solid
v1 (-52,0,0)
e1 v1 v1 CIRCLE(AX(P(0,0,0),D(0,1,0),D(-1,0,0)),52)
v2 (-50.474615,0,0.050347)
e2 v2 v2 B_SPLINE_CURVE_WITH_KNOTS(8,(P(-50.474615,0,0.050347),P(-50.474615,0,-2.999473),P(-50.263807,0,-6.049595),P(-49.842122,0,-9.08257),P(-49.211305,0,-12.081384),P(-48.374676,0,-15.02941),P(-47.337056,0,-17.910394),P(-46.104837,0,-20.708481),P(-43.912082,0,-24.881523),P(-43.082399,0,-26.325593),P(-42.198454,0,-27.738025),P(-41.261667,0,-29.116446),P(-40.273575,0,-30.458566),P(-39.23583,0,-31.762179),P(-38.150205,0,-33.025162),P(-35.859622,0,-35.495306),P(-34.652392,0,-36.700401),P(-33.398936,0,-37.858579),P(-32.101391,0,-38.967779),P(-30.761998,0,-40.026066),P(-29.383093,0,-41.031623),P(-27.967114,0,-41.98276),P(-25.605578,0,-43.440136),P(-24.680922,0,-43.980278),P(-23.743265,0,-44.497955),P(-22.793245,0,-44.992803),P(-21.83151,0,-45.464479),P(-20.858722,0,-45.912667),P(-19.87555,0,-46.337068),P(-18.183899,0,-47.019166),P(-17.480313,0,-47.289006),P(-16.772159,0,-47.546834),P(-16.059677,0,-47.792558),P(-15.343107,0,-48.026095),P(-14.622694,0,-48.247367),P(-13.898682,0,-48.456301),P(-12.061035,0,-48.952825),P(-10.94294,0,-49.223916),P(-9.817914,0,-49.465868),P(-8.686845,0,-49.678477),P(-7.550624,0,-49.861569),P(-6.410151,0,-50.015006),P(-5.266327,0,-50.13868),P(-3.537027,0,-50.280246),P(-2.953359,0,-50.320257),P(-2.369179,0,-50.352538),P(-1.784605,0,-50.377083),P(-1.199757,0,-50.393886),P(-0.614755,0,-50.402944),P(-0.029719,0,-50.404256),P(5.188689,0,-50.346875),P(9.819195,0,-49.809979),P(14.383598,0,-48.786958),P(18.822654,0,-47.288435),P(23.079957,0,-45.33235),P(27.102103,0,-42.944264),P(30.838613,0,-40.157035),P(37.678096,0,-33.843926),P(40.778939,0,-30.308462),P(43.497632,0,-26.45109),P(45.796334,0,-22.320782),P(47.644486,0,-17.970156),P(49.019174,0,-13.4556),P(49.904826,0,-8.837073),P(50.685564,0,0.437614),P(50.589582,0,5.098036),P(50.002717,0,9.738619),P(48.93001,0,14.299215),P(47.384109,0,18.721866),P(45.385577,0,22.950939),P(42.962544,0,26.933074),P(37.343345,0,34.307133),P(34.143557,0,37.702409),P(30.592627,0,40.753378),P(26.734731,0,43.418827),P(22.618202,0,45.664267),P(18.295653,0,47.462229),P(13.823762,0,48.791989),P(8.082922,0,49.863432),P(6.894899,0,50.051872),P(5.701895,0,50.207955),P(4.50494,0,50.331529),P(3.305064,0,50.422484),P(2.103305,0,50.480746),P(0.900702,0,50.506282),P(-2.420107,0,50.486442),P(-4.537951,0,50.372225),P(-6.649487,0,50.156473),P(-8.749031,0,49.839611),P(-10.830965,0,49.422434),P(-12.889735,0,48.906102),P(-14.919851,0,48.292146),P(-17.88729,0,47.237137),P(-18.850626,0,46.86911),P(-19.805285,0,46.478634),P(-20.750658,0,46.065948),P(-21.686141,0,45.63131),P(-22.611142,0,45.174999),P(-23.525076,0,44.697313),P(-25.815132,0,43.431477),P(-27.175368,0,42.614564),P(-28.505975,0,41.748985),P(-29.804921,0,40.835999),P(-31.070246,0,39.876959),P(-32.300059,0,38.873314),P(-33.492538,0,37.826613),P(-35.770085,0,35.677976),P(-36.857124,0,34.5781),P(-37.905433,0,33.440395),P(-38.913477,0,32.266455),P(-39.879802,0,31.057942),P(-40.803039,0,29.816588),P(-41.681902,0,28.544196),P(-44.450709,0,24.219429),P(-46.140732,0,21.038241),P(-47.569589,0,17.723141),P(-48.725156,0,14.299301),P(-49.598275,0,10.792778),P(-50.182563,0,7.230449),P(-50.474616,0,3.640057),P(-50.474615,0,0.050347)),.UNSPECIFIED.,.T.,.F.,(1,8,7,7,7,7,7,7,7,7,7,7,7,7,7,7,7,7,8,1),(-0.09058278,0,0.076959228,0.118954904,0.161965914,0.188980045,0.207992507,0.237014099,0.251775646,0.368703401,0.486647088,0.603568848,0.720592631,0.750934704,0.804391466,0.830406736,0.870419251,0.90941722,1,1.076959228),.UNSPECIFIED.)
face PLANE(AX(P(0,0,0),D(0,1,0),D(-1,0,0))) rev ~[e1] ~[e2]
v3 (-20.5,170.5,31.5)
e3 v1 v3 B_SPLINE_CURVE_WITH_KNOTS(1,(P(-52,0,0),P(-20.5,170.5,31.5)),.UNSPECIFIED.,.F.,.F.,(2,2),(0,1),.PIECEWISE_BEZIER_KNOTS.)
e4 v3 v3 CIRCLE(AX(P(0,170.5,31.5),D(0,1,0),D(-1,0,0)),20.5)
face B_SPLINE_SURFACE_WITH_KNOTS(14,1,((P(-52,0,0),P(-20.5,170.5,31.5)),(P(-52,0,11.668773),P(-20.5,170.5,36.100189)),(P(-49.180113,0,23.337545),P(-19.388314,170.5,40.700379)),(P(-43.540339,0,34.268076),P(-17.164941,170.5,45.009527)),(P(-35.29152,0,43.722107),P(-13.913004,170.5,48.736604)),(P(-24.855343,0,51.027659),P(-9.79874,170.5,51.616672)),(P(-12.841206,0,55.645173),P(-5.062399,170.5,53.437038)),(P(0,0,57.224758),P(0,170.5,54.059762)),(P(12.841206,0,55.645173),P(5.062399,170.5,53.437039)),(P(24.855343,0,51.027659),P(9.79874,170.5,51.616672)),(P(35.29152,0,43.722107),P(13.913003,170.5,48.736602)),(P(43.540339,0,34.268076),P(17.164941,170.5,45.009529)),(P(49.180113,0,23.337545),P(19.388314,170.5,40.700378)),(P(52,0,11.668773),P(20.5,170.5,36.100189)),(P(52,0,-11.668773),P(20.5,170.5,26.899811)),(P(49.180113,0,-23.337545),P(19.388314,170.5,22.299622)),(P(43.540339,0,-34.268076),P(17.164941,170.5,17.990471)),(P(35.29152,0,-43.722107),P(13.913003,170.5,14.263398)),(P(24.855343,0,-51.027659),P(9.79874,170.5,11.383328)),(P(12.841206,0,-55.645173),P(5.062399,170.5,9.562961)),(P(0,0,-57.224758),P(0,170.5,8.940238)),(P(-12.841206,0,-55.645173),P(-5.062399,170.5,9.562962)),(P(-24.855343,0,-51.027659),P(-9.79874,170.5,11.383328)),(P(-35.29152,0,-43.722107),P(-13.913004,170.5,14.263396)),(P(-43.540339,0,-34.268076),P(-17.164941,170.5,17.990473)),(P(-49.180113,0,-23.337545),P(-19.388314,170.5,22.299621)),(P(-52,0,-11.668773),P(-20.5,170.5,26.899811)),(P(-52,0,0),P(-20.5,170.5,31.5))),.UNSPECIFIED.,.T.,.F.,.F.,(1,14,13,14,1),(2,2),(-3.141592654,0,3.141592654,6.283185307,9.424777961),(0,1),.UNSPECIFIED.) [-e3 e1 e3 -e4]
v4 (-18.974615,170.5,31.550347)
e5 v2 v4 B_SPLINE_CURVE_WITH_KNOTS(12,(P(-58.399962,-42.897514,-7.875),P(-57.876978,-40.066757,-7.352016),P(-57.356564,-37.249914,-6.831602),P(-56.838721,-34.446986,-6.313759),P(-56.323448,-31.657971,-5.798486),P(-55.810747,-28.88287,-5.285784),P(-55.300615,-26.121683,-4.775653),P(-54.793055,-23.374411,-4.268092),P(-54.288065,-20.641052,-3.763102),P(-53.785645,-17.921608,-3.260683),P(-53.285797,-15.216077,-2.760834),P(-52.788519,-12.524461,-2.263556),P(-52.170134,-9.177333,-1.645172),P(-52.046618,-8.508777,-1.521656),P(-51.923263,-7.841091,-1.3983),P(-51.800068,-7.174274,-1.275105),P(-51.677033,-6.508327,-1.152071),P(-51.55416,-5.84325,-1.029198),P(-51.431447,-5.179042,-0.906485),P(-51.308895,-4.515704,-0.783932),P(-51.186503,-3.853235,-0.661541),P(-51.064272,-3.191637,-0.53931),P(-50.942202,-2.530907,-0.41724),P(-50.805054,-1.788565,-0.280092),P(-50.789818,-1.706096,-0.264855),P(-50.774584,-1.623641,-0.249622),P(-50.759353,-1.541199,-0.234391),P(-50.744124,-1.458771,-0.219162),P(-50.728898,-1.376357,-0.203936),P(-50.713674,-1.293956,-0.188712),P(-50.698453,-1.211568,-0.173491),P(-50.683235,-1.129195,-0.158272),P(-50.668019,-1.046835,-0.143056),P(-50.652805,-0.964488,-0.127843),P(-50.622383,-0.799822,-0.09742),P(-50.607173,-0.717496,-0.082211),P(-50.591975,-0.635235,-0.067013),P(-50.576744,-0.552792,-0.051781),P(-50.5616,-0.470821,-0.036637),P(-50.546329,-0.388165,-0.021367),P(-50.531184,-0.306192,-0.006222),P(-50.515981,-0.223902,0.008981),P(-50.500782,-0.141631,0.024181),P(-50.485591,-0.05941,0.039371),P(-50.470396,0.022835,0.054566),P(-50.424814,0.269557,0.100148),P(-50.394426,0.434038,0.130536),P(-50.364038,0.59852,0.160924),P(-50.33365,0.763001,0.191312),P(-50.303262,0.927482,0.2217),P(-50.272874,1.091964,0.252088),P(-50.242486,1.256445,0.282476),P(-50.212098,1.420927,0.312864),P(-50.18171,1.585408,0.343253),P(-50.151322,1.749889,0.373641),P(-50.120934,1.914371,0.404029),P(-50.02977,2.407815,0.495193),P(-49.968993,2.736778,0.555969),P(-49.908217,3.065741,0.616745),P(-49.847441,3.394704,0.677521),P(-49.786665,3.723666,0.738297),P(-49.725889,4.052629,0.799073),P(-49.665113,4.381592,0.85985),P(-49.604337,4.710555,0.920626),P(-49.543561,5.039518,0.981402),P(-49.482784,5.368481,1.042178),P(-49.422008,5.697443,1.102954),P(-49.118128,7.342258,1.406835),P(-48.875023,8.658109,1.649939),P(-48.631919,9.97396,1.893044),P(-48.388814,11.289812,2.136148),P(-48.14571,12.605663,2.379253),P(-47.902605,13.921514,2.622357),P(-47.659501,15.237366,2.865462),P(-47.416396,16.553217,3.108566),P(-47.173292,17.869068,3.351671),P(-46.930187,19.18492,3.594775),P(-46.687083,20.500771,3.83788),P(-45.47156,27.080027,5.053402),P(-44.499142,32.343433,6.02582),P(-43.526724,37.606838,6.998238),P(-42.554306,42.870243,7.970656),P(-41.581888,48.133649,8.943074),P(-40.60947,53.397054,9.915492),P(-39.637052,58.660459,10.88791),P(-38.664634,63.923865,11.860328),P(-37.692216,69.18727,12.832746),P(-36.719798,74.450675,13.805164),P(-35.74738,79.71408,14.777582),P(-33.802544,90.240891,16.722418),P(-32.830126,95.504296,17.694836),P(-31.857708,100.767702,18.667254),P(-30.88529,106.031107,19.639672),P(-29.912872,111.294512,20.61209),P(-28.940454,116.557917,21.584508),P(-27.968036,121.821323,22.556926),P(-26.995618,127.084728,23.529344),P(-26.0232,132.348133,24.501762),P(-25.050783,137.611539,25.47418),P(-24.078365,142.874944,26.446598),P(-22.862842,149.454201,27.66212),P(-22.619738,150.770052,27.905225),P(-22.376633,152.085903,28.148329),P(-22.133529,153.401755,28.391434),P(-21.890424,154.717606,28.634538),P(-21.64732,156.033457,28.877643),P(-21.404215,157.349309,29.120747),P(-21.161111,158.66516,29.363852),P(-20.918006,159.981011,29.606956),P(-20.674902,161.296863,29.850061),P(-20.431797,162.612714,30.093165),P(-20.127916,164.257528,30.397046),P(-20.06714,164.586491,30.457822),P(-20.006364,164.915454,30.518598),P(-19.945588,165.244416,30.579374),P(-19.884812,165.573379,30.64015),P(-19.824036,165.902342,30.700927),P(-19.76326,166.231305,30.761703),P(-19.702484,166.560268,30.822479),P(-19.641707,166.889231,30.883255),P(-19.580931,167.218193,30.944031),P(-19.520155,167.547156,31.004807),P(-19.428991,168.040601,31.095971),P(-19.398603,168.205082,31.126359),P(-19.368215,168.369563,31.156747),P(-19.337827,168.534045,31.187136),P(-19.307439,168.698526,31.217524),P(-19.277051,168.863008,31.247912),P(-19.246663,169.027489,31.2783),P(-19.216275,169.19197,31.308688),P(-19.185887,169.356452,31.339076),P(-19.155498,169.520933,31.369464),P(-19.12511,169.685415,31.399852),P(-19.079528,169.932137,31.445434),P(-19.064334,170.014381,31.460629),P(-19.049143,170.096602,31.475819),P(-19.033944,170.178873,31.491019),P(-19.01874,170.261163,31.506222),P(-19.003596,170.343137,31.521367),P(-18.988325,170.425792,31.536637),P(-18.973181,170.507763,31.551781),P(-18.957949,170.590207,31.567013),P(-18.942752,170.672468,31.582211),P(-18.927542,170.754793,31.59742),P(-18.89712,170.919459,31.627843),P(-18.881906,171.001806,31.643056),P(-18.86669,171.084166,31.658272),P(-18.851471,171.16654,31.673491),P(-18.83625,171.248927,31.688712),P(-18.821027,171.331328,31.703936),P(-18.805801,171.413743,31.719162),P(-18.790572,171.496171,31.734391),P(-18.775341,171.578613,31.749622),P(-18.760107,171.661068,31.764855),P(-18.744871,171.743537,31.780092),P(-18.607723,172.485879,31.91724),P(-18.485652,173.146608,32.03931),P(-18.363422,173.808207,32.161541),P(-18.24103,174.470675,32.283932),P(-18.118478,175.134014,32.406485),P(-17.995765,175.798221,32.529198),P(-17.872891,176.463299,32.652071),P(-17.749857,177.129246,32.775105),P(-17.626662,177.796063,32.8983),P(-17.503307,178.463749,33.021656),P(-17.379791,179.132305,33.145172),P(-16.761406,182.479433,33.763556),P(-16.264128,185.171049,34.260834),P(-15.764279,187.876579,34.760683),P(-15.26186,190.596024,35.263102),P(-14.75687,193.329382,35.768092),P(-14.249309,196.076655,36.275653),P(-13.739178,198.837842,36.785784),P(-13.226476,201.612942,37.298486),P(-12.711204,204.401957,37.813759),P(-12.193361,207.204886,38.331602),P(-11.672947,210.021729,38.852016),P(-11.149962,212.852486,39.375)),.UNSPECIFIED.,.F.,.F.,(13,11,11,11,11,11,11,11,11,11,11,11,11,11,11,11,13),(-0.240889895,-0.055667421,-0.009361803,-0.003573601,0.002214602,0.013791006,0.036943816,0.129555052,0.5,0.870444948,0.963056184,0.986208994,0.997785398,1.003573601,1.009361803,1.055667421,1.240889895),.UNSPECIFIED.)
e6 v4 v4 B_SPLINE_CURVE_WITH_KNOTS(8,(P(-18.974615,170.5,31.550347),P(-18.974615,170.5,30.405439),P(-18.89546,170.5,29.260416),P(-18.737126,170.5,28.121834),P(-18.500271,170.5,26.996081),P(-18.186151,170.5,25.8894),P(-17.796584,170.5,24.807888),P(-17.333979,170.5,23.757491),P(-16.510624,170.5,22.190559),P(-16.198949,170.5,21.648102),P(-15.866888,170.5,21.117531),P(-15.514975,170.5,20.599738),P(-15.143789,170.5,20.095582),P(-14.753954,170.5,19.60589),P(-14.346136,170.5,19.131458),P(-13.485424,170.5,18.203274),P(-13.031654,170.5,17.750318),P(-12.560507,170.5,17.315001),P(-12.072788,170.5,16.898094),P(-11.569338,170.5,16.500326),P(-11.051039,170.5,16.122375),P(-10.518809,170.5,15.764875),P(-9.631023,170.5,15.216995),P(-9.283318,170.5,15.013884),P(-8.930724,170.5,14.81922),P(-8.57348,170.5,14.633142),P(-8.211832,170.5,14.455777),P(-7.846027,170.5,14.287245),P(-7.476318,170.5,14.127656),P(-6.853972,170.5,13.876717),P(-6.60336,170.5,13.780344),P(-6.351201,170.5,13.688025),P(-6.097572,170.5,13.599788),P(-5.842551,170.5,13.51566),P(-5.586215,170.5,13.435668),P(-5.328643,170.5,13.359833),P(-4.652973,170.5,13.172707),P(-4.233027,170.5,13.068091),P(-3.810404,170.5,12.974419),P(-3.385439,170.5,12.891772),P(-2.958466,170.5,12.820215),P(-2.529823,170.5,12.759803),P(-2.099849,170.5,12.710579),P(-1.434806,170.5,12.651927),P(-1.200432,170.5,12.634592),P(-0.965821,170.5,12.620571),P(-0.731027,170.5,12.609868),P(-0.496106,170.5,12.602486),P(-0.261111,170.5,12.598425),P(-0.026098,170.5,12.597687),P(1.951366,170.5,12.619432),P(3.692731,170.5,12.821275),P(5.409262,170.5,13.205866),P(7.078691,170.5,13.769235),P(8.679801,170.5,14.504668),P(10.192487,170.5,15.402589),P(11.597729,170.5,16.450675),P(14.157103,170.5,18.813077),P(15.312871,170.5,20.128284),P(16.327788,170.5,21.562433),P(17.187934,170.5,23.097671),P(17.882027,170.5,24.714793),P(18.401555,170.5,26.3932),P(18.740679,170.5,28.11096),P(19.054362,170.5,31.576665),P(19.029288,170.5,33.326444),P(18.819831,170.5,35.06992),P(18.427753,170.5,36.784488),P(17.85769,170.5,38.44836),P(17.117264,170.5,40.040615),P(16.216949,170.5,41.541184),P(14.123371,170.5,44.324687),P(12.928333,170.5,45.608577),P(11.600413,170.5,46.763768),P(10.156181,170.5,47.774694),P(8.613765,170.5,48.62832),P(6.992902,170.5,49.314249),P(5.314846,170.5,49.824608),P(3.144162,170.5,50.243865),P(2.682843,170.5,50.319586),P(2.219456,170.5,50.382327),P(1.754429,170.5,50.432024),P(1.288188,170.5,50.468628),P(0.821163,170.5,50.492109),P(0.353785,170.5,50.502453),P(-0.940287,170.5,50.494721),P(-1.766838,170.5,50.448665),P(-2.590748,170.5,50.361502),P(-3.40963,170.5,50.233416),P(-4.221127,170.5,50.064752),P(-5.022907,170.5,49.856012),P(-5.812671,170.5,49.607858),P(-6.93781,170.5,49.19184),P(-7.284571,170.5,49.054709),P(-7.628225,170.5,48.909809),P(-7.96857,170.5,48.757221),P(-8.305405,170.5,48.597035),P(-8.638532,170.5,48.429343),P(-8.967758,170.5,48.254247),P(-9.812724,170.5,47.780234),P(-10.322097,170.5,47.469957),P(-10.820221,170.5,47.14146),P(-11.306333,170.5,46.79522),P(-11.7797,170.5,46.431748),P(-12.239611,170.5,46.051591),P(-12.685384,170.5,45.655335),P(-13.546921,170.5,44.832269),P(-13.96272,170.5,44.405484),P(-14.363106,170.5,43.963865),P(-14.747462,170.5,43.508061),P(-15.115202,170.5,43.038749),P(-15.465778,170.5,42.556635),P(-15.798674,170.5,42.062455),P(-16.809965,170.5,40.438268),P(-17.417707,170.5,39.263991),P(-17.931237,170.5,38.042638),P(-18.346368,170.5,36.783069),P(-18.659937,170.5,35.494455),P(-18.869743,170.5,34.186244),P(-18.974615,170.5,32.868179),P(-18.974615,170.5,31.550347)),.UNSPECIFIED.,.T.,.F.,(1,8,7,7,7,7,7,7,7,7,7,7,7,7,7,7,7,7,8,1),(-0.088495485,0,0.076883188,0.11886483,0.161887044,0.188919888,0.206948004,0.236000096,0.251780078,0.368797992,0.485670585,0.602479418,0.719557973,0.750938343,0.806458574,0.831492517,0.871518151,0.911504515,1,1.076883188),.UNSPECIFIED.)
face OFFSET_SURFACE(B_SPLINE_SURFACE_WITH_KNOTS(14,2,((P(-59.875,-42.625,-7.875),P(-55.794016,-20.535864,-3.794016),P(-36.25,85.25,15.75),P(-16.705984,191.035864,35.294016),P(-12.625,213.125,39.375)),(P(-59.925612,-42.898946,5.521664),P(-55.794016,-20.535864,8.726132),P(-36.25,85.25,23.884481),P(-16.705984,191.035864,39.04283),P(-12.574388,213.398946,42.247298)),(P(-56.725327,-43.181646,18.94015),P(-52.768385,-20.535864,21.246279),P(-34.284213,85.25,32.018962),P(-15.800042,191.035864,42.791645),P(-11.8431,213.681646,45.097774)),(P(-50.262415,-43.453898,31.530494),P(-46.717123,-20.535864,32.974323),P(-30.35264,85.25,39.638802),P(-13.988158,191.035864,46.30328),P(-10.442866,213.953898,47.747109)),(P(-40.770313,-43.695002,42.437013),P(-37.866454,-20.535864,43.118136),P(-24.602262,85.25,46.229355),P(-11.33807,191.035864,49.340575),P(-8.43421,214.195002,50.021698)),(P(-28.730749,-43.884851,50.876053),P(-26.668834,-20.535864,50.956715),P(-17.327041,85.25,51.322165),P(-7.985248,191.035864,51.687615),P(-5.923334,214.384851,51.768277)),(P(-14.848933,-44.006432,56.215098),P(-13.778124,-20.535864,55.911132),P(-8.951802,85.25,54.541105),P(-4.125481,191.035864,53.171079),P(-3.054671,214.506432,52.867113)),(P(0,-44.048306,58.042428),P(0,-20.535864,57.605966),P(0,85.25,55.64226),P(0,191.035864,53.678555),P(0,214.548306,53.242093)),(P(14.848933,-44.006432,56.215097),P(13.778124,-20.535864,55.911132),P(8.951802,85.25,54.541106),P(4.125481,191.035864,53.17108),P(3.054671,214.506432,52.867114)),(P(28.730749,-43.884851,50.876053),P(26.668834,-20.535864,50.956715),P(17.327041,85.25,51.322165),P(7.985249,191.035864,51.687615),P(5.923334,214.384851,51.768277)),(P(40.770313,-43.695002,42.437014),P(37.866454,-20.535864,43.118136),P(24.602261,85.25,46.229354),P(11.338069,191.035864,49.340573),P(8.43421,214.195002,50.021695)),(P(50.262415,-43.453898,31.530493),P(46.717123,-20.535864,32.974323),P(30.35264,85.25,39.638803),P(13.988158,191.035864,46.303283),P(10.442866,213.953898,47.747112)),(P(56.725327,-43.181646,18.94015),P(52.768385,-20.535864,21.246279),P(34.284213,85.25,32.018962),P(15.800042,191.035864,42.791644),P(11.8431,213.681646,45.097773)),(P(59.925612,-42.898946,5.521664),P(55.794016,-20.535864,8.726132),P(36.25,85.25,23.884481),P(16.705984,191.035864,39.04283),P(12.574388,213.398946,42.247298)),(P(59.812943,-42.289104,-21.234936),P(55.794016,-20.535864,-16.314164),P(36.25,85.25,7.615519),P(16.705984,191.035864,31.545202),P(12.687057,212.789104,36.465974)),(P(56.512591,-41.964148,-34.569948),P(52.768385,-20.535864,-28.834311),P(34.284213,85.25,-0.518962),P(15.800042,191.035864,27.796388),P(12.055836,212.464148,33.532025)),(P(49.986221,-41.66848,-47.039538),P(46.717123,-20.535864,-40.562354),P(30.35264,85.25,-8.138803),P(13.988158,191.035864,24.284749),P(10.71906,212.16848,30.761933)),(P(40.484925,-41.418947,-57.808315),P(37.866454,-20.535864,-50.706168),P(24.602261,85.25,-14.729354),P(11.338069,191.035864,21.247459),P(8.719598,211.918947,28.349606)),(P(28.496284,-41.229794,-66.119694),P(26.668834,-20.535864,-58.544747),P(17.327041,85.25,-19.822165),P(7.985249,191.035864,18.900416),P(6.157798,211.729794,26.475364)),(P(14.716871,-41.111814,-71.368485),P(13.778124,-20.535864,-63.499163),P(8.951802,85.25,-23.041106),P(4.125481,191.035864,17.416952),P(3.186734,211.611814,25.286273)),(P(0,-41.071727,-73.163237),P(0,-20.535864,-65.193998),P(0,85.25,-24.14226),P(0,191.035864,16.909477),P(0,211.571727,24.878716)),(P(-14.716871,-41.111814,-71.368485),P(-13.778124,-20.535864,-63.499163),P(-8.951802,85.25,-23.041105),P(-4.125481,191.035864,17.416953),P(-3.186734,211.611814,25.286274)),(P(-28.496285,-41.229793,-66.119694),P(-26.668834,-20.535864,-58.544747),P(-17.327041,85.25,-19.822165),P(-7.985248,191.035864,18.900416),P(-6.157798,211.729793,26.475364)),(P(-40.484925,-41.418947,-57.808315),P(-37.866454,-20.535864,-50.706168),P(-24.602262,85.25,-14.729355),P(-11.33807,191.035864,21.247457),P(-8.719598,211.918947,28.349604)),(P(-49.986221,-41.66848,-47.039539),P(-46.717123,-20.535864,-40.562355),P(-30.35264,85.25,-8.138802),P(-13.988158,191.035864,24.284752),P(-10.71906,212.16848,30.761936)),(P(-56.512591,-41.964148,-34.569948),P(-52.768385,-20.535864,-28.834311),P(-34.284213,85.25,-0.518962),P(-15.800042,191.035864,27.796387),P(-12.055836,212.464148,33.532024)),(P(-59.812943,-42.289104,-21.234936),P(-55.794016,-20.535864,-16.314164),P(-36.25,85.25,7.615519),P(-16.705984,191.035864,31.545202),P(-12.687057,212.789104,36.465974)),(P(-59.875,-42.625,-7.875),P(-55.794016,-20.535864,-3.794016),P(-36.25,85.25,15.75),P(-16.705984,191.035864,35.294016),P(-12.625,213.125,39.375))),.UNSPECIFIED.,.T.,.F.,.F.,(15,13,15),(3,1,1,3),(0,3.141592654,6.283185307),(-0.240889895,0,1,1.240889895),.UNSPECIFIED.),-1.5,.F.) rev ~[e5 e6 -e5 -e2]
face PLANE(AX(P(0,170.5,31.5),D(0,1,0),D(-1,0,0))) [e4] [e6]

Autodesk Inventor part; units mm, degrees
ref_plane "YZ Plane" through (0, 0, 0) normal (1, 0, 0) x (0, 1, 0)
ref_plane "XY Plane" through (0, 0, 0) normal (0, 0, 1) x (1, 0, 0)
sketch "Szkic6" plane through (0, 0, 0) normal (0, 1, 0) x (-1, 0, 0)
  circle A0 centre (0, 0) radius 52
  dimension "d33" = 104
ref_plane "Płaszczyzna konstrukcyjna1" through (0, 170.5, 0) normal (0, 1, 0) x (-1, 0, 0)
sketch "Szkic7" plane through (0, 170.5, 0) normal (0, 1, 0) x (-1, 0, 0)
  circle A0 centre (0, 31.5) radius 20.5
  line L0 (0, -20.3) -> (0, 20.3) construction
  circle A1 centre (0, 0) radius 52 construction
  dimension "d35" = 41
loft "Wyciągnięcie złożone1" add profiles "Szkic6", "Szkic7"
shell "Skorupa1" thickness 1.5 removed faces 2 at (4.592, 170.5, 33.9101) at (-18.5271, 0, 25.061)
equation "\"d33\" = OD1"
equation "\"d35\" = OD2"
equation "\"d52\" = THK"
equation "\"SzerokośćGięciaPodcięcia\" = Grubość"
equation "\"RozmiarPodcięciaNarożnika\" = 4 * Grubość"
equation "\"PromieńPrzejścia\" = PromieńGięcia"
equation "\"Rozmiar_promienia_Jacobiego\" = PromieńGięcia"
equation "\"Wielk_odstępu\" = Grubość"
equation "\"d2\" = PromieńGięcia"
equation "\"d23\" = PromieńGięcia"
equation "\"OD1\" = 104"
equation "\"OD2\" = 41"
equation "\"L\" = 170.5"
equation "\"THK\" = 1.5"
equation "\"d34\" = L"
equation "\"Grubość\" = 1.5"
equation "\"PromieńGięcia\" = 3"
properties part number "Redukcja asymetryczna Ø104x41x1,5 L=170,5" material "304"
